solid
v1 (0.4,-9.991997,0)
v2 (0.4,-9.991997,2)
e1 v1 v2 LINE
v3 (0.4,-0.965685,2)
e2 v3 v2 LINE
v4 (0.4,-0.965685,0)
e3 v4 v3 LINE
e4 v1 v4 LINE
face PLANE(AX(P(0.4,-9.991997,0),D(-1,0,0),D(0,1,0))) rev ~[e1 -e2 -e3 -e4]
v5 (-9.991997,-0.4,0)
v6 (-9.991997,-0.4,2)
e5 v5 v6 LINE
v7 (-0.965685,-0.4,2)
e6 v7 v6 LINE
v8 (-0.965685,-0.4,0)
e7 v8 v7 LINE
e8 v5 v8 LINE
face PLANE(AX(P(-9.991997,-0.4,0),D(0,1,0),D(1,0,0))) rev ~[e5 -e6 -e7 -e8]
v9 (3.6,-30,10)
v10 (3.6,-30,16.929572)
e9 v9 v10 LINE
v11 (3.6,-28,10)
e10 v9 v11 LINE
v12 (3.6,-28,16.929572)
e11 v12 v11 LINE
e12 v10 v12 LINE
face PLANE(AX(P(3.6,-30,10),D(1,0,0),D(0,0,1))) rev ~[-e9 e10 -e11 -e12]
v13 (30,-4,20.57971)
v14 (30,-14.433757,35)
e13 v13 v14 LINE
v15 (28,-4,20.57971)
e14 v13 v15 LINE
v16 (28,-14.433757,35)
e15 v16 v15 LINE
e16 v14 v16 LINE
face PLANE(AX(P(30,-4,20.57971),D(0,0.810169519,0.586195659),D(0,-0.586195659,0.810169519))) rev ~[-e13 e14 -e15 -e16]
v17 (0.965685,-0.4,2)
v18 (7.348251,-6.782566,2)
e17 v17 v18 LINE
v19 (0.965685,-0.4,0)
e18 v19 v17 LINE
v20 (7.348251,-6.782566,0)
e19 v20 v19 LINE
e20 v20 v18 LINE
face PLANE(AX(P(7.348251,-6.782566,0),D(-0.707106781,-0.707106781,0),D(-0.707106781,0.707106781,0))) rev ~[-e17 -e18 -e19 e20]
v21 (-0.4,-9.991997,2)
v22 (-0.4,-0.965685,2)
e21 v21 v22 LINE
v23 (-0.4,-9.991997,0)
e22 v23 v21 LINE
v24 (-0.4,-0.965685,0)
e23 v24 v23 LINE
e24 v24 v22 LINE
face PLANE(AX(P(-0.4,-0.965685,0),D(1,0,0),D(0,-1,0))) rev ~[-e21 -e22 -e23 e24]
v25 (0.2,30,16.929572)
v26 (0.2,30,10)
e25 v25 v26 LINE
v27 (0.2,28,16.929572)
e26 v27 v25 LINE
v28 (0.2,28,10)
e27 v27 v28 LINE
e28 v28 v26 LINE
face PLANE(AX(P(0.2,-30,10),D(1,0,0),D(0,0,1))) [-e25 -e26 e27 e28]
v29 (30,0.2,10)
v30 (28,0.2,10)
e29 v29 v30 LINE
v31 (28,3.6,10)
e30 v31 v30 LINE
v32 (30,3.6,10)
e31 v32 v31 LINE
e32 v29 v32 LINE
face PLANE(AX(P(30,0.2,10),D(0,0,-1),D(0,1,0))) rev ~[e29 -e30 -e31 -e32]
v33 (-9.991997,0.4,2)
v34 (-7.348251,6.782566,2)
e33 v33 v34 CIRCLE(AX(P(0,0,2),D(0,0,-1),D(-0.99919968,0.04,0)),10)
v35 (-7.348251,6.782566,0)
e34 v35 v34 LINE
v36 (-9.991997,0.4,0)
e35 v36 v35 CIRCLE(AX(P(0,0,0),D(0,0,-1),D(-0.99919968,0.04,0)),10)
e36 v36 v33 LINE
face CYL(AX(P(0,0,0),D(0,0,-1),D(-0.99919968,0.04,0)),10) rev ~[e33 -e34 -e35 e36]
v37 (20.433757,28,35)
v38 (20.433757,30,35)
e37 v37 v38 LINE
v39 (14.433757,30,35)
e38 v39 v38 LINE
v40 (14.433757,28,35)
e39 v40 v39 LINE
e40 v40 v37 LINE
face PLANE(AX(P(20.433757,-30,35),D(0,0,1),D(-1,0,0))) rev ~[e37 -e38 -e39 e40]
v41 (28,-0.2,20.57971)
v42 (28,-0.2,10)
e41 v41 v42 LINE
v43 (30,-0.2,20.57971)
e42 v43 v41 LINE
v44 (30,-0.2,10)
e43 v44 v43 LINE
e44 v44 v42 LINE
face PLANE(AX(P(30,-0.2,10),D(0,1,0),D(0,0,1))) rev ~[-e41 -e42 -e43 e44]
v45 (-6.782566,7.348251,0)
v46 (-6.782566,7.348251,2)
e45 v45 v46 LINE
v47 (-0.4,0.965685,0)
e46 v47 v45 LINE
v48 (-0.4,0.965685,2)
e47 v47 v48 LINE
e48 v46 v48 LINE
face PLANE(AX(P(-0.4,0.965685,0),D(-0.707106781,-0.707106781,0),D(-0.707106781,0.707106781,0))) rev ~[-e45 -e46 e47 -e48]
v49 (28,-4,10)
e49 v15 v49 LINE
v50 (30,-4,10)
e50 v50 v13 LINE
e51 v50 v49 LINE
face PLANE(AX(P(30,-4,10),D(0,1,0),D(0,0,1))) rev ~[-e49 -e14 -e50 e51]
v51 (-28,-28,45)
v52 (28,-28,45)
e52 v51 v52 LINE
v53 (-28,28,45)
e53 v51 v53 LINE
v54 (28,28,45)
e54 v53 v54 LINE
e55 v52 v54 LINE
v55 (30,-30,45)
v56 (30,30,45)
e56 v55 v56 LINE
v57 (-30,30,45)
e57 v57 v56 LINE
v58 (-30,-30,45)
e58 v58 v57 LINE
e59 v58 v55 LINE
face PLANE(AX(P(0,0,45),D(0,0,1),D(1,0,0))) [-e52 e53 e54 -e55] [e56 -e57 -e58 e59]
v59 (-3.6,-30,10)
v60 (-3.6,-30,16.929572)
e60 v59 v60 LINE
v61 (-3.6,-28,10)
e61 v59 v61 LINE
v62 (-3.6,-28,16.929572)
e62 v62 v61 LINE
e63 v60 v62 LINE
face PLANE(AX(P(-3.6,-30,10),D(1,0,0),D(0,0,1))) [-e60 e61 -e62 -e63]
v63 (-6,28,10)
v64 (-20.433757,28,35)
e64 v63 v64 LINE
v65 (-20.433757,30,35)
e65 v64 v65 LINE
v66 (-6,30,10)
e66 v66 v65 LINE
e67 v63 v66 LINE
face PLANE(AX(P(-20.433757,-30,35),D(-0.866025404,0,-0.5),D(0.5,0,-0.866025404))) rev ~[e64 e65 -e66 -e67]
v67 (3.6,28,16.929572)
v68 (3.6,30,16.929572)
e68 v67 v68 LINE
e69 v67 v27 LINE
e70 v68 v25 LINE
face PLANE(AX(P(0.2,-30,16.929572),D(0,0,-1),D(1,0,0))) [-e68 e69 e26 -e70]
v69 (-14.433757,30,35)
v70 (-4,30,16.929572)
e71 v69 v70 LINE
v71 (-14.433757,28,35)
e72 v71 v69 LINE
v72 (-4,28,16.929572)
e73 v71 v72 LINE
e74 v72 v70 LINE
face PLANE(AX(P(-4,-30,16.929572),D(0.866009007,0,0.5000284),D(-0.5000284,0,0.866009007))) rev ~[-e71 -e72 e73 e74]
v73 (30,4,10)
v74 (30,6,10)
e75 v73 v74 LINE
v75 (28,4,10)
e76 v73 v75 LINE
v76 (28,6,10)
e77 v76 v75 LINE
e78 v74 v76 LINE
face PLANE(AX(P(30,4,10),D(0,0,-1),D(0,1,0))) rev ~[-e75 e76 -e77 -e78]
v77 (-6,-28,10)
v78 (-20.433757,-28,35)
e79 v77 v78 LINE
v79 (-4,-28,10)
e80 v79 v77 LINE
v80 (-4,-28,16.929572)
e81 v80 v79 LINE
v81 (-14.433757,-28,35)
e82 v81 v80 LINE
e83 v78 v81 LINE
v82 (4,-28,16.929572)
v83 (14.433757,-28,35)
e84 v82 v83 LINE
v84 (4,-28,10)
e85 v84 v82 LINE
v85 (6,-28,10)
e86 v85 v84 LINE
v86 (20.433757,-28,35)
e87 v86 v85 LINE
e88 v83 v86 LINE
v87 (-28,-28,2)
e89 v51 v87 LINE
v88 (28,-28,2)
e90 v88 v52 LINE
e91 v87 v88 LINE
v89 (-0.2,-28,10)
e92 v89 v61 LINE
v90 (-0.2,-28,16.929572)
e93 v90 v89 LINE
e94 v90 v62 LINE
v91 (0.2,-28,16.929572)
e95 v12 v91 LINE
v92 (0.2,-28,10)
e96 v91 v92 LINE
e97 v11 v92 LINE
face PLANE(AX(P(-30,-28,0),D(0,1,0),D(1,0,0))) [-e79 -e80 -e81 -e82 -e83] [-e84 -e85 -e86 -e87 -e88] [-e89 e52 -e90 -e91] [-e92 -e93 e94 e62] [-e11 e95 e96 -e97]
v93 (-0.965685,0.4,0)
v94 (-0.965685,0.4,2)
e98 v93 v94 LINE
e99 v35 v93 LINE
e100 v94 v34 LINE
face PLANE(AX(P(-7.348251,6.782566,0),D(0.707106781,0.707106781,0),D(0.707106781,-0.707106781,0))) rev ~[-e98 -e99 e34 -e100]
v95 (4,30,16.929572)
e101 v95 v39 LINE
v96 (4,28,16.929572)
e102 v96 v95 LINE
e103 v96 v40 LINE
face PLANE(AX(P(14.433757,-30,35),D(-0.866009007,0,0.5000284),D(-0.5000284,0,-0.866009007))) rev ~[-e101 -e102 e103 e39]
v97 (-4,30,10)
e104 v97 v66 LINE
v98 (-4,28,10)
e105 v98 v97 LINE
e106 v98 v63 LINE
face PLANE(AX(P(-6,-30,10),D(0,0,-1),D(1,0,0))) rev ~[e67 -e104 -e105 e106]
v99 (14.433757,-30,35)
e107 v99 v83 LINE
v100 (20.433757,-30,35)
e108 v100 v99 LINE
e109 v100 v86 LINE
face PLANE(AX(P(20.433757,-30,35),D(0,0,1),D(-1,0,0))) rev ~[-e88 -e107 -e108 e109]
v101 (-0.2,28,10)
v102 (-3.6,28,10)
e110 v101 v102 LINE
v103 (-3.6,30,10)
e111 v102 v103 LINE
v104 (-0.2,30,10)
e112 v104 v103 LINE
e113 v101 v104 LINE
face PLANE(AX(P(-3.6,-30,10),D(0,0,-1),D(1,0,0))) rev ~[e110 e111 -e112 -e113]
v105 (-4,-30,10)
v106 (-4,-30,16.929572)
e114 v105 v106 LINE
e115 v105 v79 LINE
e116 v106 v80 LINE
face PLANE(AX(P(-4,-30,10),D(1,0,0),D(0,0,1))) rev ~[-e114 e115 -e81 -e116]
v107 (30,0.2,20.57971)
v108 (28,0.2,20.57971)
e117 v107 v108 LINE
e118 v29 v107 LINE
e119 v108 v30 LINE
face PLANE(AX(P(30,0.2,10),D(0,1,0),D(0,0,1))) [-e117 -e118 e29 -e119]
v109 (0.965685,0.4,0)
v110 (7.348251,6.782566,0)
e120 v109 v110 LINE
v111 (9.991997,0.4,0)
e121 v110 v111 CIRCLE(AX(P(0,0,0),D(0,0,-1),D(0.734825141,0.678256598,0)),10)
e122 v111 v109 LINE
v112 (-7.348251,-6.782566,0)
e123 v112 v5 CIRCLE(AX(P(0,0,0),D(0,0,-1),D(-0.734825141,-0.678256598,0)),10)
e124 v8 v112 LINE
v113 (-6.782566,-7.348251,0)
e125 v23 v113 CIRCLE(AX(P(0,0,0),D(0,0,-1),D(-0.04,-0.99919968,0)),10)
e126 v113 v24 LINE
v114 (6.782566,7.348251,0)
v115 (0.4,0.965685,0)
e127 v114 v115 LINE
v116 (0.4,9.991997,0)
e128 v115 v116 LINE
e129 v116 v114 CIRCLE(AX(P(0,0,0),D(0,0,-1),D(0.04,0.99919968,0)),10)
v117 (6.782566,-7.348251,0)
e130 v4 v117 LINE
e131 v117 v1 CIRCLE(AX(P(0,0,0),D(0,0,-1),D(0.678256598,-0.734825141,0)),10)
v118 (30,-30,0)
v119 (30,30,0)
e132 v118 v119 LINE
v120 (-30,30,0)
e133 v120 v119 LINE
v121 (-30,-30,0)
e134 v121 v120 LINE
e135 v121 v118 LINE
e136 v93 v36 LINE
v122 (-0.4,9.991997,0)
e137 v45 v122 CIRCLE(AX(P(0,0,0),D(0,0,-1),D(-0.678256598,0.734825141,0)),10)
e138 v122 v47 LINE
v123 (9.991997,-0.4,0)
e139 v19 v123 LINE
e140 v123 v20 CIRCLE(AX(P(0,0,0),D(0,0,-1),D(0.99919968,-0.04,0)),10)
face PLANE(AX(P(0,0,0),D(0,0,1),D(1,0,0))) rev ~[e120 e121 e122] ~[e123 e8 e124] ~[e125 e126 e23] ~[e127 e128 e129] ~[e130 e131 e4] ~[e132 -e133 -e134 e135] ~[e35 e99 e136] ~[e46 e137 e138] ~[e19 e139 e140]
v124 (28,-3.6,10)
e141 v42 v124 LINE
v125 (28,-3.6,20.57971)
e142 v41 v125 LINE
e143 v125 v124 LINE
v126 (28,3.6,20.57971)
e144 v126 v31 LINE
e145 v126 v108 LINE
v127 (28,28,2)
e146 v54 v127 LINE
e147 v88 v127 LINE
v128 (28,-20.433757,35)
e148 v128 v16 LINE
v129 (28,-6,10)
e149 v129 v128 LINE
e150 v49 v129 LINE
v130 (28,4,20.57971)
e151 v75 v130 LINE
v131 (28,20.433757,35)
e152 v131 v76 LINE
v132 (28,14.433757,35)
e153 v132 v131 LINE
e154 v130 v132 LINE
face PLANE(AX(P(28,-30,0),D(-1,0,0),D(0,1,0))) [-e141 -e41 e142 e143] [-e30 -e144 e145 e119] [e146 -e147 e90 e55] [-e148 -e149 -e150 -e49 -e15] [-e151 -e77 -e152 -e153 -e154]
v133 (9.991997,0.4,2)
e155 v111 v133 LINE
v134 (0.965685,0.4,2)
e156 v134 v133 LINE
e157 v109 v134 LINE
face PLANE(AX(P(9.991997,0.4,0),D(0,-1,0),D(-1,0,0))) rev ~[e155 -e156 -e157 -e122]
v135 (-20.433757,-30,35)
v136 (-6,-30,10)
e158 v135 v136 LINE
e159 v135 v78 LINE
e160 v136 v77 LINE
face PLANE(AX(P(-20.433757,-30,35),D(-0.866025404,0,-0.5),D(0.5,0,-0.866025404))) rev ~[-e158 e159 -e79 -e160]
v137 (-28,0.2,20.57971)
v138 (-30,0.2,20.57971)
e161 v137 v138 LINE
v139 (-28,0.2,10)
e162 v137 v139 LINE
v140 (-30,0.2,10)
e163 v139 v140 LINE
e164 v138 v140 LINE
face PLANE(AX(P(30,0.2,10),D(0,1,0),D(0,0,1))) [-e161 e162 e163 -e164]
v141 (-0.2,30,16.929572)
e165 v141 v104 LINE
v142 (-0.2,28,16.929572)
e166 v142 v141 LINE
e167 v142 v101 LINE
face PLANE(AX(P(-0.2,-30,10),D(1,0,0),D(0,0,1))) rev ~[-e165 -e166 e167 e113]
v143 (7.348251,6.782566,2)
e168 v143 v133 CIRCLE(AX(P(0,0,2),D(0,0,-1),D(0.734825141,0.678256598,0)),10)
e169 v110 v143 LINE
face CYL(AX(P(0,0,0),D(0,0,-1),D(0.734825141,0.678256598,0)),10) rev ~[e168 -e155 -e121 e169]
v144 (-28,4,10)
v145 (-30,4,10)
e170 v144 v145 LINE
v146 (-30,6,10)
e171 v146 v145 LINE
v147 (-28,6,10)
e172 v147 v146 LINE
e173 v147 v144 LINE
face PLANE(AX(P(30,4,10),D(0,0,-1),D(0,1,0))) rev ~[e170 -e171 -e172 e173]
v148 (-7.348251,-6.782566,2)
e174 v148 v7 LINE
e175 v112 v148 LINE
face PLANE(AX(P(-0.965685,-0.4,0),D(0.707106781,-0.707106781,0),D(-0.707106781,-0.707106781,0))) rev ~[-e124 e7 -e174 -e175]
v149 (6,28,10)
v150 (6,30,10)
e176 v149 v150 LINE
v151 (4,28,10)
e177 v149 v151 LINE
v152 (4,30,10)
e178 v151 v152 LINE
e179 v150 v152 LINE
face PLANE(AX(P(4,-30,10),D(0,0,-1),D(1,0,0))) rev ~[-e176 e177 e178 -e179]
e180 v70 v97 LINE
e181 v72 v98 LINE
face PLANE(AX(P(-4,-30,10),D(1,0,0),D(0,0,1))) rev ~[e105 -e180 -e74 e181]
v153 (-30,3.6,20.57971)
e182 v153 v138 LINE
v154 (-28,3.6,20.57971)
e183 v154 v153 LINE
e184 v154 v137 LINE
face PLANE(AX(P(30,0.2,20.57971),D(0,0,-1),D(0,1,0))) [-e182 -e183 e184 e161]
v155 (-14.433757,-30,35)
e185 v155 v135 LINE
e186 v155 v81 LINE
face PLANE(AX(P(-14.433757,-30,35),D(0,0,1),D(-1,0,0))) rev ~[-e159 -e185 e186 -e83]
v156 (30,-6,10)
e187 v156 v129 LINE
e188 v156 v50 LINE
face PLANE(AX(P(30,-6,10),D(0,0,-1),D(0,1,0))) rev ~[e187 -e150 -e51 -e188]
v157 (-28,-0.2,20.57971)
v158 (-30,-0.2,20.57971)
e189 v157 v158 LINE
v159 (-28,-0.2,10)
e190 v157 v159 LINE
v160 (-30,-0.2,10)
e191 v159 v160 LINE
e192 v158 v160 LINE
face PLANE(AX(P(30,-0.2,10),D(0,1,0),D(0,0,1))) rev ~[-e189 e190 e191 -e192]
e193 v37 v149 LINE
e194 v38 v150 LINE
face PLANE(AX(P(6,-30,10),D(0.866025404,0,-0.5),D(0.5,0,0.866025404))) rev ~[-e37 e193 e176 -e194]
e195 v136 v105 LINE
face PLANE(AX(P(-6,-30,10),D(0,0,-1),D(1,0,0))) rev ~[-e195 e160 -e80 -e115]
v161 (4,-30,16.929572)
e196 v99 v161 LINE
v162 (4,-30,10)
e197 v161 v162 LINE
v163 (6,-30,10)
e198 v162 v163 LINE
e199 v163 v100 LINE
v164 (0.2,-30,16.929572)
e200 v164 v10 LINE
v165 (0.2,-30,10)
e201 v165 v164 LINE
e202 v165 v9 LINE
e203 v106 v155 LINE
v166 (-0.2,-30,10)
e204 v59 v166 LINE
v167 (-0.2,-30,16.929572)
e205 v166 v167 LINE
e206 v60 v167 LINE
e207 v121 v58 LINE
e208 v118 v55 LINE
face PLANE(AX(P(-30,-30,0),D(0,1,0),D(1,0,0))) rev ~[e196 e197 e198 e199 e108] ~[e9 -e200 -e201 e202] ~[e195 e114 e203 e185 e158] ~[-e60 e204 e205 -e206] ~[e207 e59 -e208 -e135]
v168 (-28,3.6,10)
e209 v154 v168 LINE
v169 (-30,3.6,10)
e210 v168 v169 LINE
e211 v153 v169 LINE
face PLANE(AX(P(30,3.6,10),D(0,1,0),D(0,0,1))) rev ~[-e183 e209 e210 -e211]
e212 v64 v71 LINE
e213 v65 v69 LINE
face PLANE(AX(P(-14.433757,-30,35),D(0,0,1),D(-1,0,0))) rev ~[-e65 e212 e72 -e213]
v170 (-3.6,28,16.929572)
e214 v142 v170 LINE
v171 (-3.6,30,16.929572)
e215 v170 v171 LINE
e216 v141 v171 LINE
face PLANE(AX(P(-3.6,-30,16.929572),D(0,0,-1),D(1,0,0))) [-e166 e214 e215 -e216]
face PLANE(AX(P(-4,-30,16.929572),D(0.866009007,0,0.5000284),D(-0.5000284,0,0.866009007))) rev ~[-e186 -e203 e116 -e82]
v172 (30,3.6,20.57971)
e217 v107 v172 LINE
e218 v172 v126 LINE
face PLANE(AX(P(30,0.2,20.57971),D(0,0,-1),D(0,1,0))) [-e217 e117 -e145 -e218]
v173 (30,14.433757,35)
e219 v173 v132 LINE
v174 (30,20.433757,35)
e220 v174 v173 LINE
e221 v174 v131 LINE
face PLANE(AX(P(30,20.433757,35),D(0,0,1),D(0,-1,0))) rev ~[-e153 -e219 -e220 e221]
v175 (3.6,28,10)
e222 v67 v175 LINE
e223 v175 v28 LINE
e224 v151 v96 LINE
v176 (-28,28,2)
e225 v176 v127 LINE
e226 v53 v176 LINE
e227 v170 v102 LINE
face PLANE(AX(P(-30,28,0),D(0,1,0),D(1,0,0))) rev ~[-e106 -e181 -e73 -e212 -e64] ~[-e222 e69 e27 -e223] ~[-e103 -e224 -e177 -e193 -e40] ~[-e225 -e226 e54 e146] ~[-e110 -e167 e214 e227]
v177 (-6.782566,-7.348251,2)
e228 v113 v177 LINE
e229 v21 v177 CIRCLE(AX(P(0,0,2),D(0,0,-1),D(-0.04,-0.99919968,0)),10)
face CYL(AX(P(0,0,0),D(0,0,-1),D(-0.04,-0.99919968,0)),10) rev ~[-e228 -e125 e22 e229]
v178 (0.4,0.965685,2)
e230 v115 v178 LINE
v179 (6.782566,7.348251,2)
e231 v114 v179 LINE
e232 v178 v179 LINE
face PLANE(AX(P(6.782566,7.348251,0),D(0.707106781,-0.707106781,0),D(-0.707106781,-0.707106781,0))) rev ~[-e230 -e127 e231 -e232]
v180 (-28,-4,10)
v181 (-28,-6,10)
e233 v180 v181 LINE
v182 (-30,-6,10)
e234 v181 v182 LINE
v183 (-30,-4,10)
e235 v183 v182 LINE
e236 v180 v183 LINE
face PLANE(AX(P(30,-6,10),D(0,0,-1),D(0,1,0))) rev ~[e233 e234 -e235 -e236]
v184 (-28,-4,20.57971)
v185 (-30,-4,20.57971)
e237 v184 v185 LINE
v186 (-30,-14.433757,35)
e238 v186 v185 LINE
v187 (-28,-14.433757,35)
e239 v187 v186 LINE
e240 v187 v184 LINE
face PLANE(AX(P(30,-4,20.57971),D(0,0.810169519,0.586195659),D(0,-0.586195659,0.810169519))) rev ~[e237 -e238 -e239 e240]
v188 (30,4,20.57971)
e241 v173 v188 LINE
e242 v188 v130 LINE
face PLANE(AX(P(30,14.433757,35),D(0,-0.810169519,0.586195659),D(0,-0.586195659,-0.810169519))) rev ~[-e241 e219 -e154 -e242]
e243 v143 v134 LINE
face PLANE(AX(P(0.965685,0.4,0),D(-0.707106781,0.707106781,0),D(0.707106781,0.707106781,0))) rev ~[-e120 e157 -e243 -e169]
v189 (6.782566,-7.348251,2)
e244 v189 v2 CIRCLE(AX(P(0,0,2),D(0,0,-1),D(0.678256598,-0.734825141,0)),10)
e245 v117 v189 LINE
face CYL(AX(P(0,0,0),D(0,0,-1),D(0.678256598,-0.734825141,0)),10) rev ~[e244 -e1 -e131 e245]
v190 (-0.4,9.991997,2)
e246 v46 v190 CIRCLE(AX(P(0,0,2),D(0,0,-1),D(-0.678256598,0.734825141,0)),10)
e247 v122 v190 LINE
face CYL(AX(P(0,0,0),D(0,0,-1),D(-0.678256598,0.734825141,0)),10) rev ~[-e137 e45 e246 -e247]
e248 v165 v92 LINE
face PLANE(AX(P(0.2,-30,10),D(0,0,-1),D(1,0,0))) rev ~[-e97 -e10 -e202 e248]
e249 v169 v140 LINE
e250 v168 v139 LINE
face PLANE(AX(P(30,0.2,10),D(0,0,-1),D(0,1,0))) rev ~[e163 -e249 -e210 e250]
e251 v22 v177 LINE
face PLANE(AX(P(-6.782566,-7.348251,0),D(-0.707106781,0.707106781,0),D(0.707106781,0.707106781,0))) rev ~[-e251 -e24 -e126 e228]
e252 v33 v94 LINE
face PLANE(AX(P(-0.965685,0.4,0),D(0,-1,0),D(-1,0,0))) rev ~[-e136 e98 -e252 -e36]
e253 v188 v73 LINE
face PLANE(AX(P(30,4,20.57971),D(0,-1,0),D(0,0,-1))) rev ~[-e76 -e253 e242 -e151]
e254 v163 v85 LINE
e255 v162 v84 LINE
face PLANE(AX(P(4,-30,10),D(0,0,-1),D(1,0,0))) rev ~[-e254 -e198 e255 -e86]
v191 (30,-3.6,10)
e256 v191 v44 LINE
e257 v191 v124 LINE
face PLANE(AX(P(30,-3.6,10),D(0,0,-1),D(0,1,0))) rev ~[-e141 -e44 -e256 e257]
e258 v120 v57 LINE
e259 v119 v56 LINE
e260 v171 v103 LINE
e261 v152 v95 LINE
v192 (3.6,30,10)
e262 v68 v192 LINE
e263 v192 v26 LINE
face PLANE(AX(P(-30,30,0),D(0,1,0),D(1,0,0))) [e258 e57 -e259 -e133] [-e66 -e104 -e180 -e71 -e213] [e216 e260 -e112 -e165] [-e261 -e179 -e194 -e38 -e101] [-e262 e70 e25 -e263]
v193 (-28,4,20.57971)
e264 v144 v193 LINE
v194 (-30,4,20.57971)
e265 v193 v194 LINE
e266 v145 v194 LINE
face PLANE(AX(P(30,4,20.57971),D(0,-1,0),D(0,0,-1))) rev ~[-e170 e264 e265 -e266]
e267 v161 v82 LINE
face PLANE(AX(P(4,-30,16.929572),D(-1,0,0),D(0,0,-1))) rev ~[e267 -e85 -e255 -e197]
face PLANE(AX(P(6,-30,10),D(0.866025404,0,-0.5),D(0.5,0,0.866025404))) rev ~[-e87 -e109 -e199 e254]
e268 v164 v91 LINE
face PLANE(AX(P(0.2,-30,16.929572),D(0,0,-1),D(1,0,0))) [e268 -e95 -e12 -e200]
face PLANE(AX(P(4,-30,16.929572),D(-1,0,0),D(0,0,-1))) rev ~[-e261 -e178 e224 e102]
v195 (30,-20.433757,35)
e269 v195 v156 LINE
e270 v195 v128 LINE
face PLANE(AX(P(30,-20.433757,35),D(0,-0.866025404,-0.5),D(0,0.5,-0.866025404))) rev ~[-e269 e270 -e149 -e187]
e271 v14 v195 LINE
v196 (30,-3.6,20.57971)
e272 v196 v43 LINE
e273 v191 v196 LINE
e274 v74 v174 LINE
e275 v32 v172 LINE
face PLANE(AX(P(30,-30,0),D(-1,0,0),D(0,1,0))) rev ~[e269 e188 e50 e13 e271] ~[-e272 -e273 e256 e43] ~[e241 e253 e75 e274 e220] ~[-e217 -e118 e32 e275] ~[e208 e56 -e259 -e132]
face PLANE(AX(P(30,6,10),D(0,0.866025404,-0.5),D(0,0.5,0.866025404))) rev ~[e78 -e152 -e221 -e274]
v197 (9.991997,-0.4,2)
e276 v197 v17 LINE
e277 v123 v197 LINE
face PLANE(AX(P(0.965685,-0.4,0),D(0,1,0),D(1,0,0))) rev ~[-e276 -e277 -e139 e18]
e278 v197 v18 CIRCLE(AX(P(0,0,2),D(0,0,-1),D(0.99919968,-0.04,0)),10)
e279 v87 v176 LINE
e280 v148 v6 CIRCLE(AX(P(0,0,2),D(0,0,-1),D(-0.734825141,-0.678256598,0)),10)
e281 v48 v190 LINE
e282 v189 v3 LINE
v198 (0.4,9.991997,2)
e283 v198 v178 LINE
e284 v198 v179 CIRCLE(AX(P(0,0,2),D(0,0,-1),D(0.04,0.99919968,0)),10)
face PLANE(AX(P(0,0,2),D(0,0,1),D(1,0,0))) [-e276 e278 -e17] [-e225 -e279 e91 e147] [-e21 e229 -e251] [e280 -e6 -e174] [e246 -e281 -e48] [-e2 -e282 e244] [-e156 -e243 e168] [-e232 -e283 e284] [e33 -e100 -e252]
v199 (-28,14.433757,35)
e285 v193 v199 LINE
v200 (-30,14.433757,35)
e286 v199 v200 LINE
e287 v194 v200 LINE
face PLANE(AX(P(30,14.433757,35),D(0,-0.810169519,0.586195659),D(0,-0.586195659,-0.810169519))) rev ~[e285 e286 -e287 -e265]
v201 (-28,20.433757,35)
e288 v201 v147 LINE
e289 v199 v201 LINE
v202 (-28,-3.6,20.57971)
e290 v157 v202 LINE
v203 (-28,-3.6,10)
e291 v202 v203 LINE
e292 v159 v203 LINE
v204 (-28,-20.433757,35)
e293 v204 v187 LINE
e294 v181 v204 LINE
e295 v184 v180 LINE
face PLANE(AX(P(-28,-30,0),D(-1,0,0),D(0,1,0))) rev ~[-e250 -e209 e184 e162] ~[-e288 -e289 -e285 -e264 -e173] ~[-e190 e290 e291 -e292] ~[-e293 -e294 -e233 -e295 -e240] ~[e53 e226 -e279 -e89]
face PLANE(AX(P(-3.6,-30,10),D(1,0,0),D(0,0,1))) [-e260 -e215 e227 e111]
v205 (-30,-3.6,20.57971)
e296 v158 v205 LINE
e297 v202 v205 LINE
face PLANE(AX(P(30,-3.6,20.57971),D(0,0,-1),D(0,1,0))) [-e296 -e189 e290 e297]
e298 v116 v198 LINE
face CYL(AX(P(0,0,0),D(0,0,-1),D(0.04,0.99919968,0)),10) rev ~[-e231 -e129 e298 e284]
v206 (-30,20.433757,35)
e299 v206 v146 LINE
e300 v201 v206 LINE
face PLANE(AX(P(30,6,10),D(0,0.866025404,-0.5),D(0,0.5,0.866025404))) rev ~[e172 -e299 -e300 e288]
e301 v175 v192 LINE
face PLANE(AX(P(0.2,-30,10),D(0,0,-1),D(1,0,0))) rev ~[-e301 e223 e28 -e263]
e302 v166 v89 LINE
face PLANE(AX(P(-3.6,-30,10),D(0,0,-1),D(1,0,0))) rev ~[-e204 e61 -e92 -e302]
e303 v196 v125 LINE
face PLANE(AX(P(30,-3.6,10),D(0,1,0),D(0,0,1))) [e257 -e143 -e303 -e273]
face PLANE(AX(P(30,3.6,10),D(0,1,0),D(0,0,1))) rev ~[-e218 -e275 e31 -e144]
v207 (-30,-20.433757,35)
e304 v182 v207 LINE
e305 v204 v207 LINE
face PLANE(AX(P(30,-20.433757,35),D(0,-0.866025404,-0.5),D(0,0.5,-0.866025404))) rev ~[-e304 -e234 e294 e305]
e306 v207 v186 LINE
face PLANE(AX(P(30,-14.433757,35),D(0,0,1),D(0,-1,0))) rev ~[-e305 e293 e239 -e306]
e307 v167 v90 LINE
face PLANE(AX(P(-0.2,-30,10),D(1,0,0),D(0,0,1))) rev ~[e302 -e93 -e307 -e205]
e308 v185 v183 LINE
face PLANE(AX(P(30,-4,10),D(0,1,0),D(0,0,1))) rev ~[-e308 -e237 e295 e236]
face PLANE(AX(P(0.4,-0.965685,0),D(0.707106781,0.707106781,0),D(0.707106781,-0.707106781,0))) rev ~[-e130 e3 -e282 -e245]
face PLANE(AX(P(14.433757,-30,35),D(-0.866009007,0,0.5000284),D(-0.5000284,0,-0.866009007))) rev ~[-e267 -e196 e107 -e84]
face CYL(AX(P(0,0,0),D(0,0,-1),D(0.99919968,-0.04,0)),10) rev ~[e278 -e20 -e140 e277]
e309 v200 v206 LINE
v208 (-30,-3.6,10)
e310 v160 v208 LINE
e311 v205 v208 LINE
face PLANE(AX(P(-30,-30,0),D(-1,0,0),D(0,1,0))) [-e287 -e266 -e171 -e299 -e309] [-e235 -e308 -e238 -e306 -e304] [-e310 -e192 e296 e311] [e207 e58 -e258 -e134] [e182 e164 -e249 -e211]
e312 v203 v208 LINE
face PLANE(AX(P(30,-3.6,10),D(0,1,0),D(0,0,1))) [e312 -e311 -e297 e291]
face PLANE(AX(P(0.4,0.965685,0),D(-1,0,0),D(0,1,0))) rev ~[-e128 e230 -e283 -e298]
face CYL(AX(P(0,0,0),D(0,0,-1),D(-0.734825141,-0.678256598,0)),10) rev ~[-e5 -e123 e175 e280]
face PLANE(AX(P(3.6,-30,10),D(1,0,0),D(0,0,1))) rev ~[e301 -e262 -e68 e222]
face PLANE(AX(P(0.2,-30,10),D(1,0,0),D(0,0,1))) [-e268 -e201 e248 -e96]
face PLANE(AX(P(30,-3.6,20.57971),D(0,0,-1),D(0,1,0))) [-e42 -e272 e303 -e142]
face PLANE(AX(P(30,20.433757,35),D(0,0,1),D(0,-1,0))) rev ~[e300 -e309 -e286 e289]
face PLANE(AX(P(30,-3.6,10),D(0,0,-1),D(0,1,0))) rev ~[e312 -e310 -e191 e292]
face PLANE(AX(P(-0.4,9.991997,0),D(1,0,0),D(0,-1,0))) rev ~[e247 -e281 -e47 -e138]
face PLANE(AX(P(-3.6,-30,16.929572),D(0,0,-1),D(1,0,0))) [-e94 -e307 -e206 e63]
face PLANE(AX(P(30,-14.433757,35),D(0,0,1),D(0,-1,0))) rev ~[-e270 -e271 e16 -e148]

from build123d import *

# Parameters (mm, degrees)
F0_W     = 60
F0_H     = 60
F1_DEPTH = 45
F2_T     = -2
F3_W     = 3.4
F3_H     = 6.9295717942
F4_DEPTH = 64.2
F5_W     = 3.4
F5_H     = 10.5797095255
F6_DEPTH = 63.5
F8_DEPTH = 25


# Not quite as in the source:
# - a feature names something its author has since deleted; it is built from what else it names


with BuildPart() as f1:
    # F0 (on Top) → F1 (new body)
    with BuildSketch(Plane.XY):
        Rectangle(F0_W, F0_H)
    extrude(amount=F1_DEPTH)

    # F2
    f2_openings = [f1.faces().sort_by_distance(p)[0] for p in [
        (0, 0, 45),
    ]]
    offset(amount=F2_T, openings=f2_openings)

    # F3 (on face) → F4 (cut)
    with BuildSketch(Plane.XZ.offset(30)):
        Polygon((-20.4337567297, 35), (-6, 10), (-4, 10), (-4, 16.9295717942), (-14.4337567297, 35), align=None)
        with Locations((-1.9, 13.4647858971)):
            Rectangle(F3_W, F3_H)
        with Locations((1.9, 13.4647858971)):
            Rectangle(F3_W, F3_H)
        Polygon((4, 16.9295717942), (4, 10), (6, 10), (20.4337567297, 35), (14.4337567297, 35), align=None)
    extrude(amount=-F4_DEPTH, mode=Mode.SUBTRACT)

    # F5 (on face) → F6 (cut)
    with BuildSketch(Plane.YZ.offset(30)):
        Polygon((-20.4337567297, 35), (-6, 10), (-4, 10), (-4, 20.5797095255), (-14.4337567297, 35), align=None)
        with Locations((-1.9, 15.2898547627)):
            Rectangle(F5_W, F5_H)
        with Locations((1.9, 15.2898547627)):
            Rectangle(F5_W, F5_H)
        Polygon((4, 20.5797095255), (4, 10), (6, 10), (20.4337567297, 35), (14.4337567297, 35), align=None)
    extrude(amount=-F6_DEPTH, mode=Mode.SUBTRACT)

    # F7 (on face) → F8 (cut)
    with BuildSketch(Plane(origin=(0, 0, 0), x_dir=(1, 0, 0), z_dir=(0, 0, -1))):
        with BuildLine():
            Line((0.9656854249, 0.4), (9.9919967974, 0.4))
            ThreePointArc((9.9919967974, 0.4), (9.2387953251, 3.8268343237), (7.3482514055, 6.7825659806))
            Line((7.3482514055, 6.7825659806), (0.9656854249, 0.4))
        make_face()
        with BuildLine():
            ThreePointArc((7.3482514055, -6.7825659806), (9.2387953251, -3.8268343237), (9.9919967974, -0.4))
            Line((9.9919967974, -0.4), (0.9656854249, -0.4))
            Line((0.9656854249, -0.4), (7.3482514055, -6.7825659806))
        make_face()
        with BuildLine():
            Line((0.4, 0.9656854249), (6.7825659806, 7.3482514055))
            ThreePointArc((6.7825659806, 7.3482514055), (3.8268343237, 9.2387953251), (0.4, 9.9919967974))
            Line((0.4, 9.9919967974), (0.4, 0.9656854249))
        make_face()
        with BuildLine():
            ThreePointArc((0.4, -9.9919967974), (3.8268343237, -9.2387953251), (6.7825659806, -7.3482514055))
            Line((6.7825659806, -7.3482514055), (0.4, -0.9656854249))
            Line((0.4, -0.9656854249), (0.4, -9.9919967974))
        make_face()
        with BuildLine():
            Line((-6.7825659806, 7.3482514055), (-0.4, 0.9656854249))
            Line((-0.4, 0.9656854249), (-0.4, 9.9919967974))
            ThreePointArc((-0.4, 9.9919967974), (-3.8268343237, 9.2387953251), (-6.7825659806, 7.3482514055))
        make_face()
        with BuildLine():
            Line((-0.4, -9.9919967974), (-0.4, -0.9656854249))
            Line((-0.4, -0.9656854249), (-6.7825659806, -7.3482514055))
            ThreePointArc((-6.7825659806, -7.3482514055), (-3.8268343237, -9.2387953251), (-0.4, -9.9919967974))
        make_face()
        with BuildLine():
            Line((-7.3482514055, -6.7825659806), (-0.9656854249, -0.4))
            Line((-0.9656854249, -0.4), (-9.9919967974, -0.4))
            ThreePointArc((-9.9919967974, -0.4), (-9.2387953251, -3.8268343237), (-7.3482514055, -6.7825659806))
        make_face()
        with BuildLine():
            Line((-9.9919967974, 0.4), (-0.9656854249, 0.4))
            Line((-0.9656854249, 0.4), (-7.3482514055, 6.7825659806))
            ThreePointArc((-7.3482514055, 6.7825659806), (-9.2387953251, 3.8268343237), (-9.9919967974, 0.4))
        make_face()
    extrude(amount=-F8_DEPTH, mode=Mode.SUBTRACT)


solid = f1.part
